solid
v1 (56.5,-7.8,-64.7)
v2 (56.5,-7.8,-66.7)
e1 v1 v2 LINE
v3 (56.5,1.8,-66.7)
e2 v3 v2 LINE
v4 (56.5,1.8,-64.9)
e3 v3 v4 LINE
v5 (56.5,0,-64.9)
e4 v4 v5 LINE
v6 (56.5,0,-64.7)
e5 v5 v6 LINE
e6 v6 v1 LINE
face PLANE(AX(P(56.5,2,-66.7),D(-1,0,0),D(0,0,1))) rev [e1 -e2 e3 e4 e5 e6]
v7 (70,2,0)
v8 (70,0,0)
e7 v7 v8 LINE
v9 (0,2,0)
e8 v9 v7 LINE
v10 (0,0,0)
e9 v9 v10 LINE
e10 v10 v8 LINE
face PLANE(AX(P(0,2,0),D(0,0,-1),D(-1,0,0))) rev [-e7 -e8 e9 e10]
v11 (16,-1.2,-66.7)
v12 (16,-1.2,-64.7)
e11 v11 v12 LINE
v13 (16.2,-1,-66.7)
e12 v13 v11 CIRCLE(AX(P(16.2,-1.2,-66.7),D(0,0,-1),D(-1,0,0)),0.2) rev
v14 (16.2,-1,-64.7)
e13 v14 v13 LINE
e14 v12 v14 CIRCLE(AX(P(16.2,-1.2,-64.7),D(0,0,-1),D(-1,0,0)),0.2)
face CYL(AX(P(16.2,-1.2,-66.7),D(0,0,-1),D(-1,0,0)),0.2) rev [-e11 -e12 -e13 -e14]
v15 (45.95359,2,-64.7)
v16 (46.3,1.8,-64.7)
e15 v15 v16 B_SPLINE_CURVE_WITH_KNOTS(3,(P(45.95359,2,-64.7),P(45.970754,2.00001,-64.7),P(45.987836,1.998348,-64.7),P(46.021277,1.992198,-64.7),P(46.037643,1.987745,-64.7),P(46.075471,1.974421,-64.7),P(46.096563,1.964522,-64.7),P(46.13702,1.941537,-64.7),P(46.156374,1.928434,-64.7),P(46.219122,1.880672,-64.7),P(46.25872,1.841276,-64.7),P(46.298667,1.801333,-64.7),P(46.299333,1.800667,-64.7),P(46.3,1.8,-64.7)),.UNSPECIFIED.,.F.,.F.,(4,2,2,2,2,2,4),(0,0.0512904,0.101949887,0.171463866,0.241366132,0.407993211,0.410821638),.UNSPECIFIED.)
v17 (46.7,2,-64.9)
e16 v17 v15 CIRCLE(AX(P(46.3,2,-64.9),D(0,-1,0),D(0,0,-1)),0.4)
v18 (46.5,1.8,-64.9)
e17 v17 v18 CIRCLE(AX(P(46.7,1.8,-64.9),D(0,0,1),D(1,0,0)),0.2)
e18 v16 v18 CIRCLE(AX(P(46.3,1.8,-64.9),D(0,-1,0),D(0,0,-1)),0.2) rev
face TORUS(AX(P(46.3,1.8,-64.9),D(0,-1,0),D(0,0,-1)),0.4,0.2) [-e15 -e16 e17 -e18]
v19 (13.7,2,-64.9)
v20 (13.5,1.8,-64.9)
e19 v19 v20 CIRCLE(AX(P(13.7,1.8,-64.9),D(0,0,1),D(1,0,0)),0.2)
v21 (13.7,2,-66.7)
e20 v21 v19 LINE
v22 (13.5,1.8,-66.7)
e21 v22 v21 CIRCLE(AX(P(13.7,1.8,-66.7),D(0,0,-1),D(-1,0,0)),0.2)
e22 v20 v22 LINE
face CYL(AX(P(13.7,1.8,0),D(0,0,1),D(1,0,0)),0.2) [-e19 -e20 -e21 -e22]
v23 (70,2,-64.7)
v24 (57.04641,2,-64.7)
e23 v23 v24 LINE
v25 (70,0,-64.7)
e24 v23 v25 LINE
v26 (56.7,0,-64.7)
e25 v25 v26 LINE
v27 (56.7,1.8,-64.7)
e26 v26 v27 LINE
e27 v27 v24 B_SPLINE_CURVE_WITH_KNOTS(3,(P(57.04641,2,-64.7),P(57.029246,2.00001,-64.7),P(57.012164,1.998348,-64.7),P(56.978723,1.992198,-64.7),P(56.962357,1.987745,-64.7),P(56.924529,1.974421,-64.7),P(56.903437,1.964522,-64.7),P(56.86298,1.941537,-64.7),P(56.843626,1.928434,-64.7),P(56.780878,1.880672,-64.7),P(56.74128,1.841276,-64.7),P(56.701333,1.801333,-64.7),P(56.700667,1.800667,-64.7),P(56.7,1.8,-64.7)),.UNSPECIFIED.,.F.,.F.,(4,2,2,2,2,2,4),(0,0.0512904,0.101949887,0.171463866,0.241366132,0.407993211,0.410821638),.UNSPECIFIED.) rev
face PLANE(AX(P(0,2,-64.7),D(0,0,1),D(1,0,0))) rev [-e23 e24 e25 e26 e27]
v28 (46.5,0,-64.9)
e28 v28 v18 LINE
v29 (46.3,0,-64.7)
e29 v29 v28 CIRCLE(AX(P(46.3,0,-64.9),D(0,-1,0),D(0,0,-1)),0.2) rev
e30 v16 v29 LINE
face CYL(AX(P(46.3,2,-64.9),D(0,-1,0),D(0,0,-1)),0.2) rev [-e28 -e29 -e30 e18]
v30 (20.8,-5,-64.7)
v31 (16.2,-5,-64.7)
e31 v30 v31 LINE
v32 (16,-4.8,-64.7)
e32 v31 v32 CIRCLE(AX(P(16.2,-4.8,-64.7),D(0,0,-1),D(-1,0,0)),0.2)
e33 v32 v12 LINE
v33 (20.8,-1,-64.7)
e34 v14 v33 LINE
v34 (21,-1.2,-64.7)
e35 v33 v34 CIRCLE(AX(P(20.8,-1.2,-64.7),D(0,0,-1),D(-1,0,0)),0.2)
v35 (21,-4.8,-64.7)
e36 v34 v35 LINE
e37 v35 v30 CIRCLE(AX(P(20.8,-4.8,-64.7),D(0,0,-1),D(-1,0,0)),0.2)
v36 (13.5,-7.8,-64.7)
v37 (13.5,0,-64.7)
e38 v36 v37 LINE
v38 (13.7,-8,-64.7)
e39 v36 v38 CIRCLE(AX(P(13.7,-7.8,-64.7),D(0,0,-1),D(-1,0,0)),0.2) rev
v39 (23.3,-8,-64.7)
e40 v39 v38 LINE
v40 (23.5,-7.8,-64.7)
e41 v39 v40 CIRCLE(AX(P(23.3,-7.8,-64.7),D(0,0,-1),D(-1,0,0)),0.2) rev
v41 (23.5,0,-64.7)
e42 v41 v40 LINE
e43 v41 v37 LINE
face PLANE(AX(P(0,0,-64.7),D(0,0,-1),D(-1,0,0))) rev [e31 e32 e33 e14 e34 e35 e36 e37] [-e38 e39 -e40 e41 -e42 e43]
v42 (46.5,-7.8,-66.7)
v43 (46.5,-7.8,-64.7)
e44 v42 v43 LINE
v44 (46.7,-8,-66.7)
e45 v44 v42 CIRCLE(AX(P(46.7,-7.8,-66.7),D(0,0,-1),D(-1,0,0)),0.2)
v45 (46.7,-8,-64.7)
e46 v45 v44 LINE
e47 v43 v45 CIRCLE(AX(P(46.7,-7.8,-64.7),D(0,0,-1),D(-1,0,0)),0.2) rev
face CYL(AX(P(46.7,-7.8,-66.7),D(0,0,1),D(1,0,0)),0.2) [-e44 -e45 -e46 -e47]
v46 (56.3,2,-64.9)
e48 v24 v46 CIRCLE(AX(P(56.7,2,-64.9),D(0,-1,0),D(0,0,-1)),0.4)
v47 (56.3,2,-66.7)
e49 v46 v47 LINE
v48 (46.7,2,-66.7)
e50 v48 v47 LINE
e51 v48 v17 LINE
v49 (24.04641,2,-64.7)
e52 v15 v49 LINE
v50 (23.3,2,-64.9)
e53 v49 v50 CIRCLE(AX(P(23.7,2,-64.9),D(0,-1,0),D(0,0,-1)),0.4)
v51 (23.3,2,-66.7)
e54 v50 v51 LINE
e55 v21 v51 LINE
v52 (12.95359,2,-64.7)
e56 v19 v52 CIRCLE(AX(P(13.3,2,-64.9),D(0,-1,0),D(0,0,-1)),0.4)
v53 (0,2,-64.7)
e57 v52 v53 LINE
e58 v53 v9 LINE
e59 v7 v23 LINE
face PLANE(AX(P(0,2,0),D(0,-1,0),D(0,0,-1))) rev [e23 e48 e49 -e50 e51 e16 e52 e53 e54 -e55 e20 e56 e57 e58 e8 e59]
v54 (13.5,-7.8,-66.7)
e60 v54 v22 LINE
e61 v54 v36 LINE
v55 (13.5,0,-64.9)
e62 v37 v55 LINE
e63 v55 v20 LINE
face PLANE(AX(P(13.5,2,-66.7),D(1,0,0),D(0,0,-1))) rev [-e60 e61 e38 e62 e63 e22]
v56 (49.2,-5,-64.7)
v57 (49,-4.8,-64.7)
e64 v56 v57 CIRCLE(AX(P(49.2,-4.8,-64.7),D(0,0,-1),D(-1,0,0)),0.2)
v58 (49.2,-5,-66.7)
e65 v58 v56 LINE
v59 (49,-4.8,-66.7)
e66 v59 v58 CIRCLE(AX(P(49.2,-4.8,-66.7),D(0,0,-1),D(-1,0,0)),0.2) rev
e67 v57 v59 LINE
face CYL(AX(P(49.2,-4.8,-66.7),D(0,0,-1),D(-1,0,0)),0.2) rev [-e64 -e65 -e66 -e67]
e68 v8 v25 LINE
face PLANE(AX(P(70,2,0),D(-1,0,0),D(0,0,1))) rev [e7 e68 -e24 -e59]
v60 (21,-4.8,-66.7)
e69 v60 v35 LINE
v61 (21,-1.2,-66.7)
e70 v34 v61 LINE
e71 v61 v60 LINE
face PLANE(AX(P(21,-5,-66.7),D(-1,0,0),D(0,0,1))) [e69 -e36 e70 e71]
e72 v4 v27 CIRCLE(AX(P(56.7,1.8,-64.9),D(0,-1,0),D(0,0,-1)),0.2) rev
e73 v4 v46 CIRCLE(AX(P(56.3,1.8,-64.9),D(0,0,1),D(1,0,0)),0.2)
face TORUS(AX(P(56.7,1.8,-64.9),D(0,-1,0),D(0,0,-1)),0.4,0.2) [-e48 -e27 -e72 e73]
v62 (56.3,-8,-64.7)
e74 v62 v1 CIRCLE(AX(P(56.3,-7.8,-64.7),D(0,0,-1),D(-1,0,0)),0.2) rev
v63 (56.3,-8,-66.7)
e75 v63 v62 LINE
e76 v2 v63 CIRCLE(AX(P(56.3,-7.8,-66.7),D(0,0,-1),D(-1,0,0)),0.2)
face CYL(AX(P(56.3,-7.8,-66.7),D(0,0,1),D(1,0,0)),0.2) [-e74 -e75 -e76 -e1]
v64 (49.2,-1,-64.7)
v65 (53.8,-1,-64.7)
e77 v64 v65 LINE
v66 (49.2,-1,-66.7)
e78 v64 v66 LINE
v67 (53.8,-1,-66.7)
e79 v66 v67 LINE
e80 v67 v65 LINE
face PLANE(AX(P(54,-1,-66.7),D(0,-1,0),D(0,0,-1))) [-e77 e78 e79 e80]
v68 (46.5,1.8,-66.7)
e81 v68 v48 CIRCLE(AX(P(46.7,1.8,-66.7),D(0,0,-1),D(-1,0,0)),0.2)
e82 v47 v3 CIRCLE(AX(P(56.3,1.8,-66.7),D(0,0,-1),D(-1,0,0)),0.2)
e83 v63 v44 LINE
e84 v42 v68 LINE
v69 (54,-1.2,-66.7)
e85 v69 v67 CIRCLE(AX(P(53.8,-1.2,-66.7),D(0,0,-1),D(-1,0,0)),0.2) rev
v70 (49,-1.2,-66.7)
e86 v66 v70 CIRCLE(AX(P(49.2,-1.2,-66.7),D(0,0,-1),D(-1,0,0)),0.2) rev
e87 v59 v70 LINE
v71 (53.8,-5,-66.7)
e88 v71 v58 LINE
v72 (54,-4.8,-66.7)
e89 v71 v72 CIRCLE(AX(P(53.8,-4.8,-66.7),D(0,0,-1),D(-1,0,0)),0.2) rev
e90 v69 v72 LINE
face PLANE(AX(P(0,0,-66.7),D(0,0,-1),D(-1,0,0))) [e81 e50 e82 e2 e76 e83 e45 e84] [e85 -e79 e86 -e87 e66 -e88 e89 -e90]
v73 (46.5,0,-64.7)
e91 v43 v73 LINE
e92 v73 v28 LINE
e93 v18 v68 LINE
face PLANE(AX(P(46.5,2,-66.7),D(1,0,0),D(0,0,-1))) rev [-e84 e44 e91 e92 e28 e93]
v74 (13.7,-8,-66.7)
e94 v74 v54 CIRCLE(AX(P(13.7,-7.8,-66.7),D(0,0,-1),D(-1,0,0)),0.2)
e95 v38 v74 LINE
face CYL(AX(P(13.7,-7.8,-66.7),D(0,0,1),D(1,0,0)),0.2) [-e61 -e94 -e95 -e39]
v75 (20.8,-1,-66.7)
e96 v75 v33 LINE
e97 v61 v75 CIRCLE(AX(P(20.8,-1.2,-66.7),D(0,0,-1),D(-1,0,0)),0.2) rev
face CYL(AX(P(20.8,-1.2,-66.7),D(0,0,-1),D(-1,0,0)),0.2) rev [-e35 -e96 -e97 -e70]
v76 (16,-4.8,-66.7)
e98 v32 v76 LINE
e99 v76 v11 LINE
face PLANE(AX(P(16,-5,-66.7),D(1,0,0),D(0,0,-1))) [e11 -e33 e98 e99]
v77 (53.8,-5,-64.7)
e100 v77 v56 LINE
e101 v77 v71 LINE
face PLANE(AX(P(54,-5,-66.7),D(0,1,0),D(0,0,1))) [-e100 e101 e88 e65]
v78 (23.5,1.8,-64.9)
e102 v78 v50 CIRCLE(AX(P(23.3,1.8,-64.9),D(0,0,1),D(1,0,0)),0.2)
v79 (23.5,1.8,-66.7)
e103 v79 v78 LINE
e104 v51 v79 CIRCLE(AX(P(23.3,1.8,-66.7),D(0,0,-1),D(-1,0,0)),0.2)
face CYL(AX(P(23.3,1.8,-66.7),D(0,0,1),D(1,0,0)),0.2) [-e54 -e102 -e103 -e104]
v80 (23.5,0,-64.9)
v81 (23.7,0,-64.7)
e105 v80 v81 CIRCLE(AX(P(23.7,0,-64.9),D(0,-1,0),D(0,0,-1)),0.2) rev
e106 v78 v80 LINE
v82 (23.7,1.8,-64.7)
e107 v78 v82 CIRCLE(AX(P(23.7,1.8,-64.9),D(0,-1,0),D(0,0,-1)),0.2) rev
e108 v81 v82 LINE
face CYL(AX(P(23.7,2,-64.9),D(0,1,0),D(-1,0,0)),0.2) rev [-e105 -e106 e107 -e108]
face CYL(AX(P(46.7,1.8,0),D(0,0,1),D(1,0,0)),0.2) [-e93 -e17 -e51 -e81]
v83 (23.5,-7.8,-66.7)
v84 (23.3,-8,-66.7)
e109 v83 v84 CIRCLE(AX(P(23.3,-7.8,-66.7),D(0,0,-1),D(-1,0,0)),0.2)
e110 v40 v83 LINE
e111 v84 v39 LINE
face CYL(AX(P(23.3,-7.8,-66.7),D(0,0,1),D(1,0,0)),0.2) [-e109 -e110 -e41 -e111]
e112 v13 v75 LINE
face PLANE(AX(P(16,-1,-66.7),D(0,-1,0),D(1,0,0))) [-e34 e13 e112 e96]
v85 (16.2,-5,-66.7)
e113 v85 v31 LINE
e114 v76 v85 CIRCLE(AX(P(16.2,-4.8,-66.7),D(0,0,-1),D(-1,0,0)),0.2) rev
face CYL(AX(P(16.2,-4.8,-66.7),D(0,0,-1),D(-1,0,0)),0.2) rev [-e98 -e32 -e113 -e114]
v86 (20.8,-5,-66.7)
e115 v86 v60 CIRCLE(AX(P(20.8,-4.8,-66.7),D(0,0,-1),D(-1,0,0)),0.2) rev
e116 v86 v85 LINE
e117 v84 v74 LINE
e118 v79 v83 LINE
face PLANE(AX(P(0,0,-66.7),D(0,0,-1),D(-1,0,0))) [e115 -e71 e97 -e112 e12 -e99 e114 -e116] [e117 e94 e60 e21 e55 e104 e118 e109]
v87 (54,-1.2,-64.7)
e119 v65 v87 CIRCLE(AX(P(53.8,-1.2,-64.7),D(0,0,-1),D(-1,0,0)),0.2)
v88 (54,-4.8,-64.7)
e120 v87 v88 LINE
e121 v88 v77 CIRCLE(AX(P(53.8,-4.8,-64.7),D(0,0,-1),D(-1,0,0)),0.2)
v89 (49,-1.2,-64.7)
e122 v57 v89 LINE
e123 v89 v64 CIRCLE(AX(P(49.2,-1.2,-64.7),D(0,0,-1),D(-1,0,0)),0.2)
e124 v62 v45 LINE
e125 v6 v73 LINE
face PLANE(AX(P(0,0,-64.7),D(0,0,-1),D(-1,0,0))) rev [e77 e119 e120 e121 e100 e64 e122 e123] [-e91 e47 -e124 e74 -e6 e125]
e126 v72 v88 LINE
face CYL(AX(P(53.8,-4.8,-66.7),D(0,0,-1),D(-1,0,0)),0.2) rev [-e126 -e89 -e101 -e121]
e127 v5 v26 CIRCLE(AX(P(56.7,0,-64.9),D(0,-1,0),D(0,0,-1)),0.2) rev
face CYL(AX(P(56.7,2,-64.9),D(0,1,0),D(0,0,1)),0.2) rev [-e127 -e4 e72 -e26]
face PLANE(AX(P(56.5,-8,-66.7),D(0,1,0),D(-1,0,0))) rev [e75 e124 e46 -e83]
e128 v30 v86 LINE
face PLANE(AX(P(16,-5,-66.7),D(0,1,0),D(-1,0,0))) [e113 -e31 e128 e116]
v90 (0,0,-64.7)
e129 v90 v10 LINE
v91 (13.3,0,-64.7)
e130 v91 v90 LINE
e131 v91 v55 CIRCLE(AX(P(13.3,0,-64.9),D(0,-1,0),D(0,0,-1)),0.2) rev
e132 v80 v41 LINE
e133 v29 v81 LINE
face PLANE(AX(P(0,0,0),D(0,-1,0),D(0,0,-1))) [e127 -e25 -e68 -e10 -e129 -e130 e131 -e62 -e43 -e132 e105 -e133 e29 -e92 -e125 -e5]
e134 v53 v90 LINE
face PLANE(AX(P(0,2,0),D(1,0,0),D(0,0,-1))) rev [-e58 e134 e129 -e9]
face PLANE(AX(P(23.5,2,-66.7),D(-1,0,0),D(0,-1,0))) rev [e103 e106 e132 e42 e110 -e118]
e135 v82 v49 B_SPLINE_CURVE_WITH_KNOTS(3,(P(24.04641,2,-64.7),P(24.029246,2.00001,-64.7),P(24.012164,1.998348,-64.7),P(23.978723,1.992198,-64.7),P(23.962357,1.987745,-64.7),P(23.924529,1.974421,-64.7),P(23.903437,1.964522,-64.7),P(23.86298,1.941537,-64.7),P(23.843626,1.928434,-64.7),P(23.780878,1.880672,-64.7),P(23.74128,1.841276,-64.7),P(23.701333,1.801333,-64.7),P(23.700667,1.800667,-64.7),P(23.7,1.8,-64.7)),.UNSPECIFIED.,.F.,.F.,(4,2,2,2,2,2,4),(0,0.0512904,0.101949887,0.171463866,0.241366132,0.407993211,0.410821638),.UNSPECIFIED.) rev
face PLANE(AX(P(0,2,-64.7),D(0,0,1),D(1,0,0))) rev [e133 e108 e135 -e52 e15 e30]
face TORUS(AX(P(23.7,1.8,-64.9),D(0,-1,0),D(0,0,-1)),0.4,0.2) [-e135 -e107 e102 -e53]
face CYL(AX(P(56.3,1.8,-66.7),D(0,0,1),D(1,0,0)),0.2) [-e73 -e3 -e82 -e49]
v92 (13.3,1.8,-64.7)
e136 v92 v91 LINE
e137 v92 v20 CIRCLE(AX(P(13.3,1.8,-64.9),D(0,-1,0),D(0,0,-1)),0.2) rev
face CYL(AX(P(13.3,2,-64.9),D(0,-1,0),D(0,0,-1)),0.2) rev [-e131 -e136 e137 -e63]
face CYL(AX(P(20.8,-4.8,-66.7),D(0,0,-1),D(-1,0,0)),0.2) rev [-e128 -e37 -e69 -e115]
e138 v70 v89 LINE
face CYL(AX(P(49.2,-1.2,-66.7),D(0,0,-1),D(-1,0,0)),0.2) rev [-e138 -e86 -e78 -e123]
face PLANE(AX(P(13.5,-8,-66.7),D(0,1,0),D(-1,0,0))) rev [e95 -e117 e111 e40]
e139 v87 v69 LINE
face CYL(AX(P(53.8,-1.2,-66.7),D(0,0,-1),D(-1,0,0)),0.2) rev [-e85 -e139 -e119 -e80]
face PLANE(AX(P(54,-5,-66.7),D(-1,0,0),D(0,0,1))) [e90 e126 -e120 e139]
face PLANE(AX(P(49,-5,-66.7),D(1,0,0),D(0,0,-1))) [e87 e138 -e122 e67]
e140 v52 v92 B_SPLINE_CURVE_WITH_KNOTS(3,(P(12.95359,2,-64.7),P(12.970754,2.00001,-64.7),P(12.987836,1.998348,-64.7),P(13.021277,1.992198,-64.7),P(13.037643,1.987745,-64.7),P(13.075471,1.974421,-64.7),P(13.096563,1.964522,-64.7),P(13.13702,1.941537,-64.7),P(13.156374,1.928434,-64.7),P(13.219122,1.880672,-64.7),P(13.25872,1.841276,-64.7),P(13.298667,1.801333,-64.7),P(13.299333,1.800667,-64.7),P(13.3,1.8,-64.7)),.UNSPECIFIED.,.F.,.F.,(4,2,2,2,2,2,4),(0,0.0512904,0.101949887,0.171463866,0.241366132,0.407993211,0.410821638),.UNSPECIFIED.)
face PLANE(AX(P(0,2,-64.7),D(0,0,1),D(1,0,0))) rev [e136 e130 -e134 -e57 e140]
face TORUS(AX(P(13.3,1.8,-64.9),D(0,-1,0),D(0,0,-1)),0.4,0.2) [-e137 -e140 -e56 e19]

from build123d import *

# Parameters (mm, degrees)
SKETCH1_W           = 70
SKETCH1_H           = 64.7
BOSS_EXTRUDE1_DEPTH = 2
SKETCH2_W           = 10
SKETCH2_H           = 10
SKETCH2_W_2         = 5
SKETCH2_H_2         = 4
BOSS_EXTRUDE2_DEPTH = 2
FILLET2_R           = 0.2


with BuildPart() as part:
    # Sketch1 → Boss-Extrude1 (new body)
    with BuildSketch(Plane(origin=(0, 0, 0), x_dir=(1, 0, 0), z_dir=(0, 1, 0))):
        with Locations((35, 32.35)):
            Rectangle(SKETCH1_W, SKETCH1_H)
    extrude(amount=BOSS_EXTRUDE1_DEPTH)

    # Sketch2 → Boss-Extrude2 (add)
    # profile 1 of 2: a face of its own
    with BuildSketch(Plane(origin=(0, 0, -64.7), x_dir=(-1, 0, 0), z_dir=(0, 0, -1))):
        with Locations((-51.5, -3)):
            Rectangle(SKETCH2_W, SKETCH2_H)
        with Locations((-51.5, -3)):
            Rectangle(SKETCH2_W_2, SKETCH2_H_2, mode=Mode.SUBTRACT)
    # profile 2 of 2: a face of its own
    with BuildSketch(Plane(origin=(0, 0, -64.7), x_dir=(-1, 0, 0), z_dir=(0, 0, -1))):
        with Locations((-18.5, -3)):
            Rectangle(SKETCH2_W, SKETCH2_H)
        with Locations((-18.5, -3)):
            Rectangle(SKETCH2_W_2, SKETCH2_H_2, mode=Mode.SUBTRACT)
    extrude(amount=BOSS_EXTRUDE2_DEPTH)

    # Fillet2
    # the kernel refuses this fillet: 0.2 mm, written as the material it adds along each edge
    with BuildSketch(Plane(origin=(13.5, 0, -64.7), x_dir=(-1, 0, 0), z_dir=(0, 1, 0)), Plane(origin=(23.5, 2, -64.7), x_dir=(1, 0, 0), z_dir=(0, -1, 0)), Plane(origin=(21, -5, -64.7), x_dir=(0, 1, 0), z_dir=(0, 0, -1)), Plane(origin=(16, -5, -64.7), x_dir=(1, 0, 0), z_dir=(0, 0, -1)), Plane(origin=(49, -5, -64.7), x_dir=(1, 0, 0), z_dir=(0, 0, -1)), Plane(origin=(49, -1, -64.7), x_dir=(0, -1, 0), z_dir=(0, 0, -1))) as fillet2_piece_1:
        with BuildLine():
            CenterArc((FILLET2_R, -FILLET2_R), FILLET2_R, 90, 90)
            Line((0, -FILLET2_R), (0, 0))
            Line((0, 0), (FILLET2_R, 0))
        make_face()
    extrude(amount=2)
    with BuildSketch(Plane(origin=(56.5, 0, -64.7), x_dir=(1, 0, 0), z_dir=(0, 1, 0)), Plane(origin=(46.5, 2, -64.7), x_dir=(-1, 0, 0), z_dir=(0, -1, 0)), Plane(origin=(21, -1, -64.7), x_dir=(0, -1, 0), z_dir=(0, 0, -1)), Plane(origin=(16, -1, -64.7), x_dir=(1, 0, 0), z_dir=(0, 0, -1)), Plane(origin=(54, -1, -64.7), x_dir=(0, -1, 0), z_dir=(0, 0, -1)), Plane(origin=(54, -5, -64.7), x_dir=(-1, 0, 0), z_dir=(0, 0, -1))) as fillet2_piece_2:
        with BuildLine():
            CenterArc((FILLET2_R, FILLET2_R), FILLET2_R, 180, 90)
            Line((0, FILLET2_R), (0, 0))
            Line((0, 0), (FILLET2_R, 0))
        make_face()
    extrude(amount=2)
    # the kernel refuses this fillet: 0.2 mm, written as the material it takes off along each edge
    with BuildSketch(Plane(origin=(13.5, 2, -64.9), x_dir=(1, 0, 0), z_dir=(0, 0, -1)), Plane(origin=(46.5, 2, -64.9), x_dir=(1, 0, 0), z_dir=(0, 0, -1))) as fillet2_2_piece_1:
        with BuildLine():
            CenterArc((FILLET2_R, FILLET2_R), FILLET2_R, 180, 90)
            Line((0, FILLET2_R), (0, 0))
            Line((0, 0), (FILLET2_R, 0))
        make_face()
    extrude(amount=2.3, mode=Mode.SUBTRACT)
    with BuildSketch(Plane(origin=(13.5, -8, -64.2), x_dir=(0, 1, 0), z_dir=(0, 0, -1)), Plane(origin=(46.5, -8, -64.2), x_dir=(0, 1, 0), z_dir=(0, 0, -1))) as fillet2_2_piece_2:
        with BuildLine():
            CenterArc((FILLET2_R, FILLET2_R), FILLET2_R, 180, 90)
            Line((0, FILLET2_R), (0, 0))
            Line((0, 0), (FILLET2_R, 0))
        make_face()
    extrude(amount=3, mode=Mode.SUBTRACT)
    with BuildSketch(Plane(origin=(23.5, -8, -64.2), x_dir=(0, 1, 0), z_dir=(0, 0, -1)), Plane(origin=(56.5, -8, -64.2), x_dir=(0, 1, 0), z_dir=(0, 0, -1))) as fillet2_2_piece_3:
        with BuildLine():
            CenterArc((FILLET2_R, -FILLET2_R), FILLET2_R, 90, 90)
            Line((0, -FILLET2_R), (0, 0))
            Line((0, 0), (FILLET2_R, 0))
        make_face()
    extrude(amount=3, mode=Mode.SUBTRACT)
    with BuildSketch(Plane(origin=(23.5, 2, -64.9), x_dir=(-1, 0, 0), z_dir=(0, 0, -1)), Plane(origin=(56.5, 2, -64.9), x_dir=(-1, 0, 0), z_dir=(0, 0, -1))) as fillet2_2_piece_4:
        with BuildLine():
            CenterArc((FILLET2_R, -FILLET2_R), FILLET2_R, 90, 90)
            Line((0, -FILLET2_R), (0, 0))
            Line((0, 0), (FILLET2_R, 0))
        make_face()
    extrude(amount=2.3, mode=Mode.SUBTRACT)
    with BuildSketch(Plane(origin=(46.3, 2, -64.9), x_dir=(-0.5976672776327815, 0, -0.8017442392976825), z_dir=(0.8017442392976825, 0, -0.5976672776327815))) as fillet2_2_piece_5:
        with BuildLine():
            CenterArc((0.2 + FILLET2_R, -FILLET2_R), FILLET2_R, 90, 90)
            Line((0.2, -FILLET2_R), (0.2, 0))
            Line((0.2, 0), (0.2 + FILLET2_R, 0))
        make_face()
    revolve(axis=Axis((46.3, 2, -64.9), (0, 1, 0)), revolution_arc=233.296989237, mode=Mode.SUBTRACT)
    with BuildSketch(Plane(origin=(56.7, 2, -64.9), x_dir=(0.5976672776327815, 0, -0.8017442392976825), z_dir=(-0.8017442392976825, 0, -0.5976672776327815))) as fillet2_2_piece_6:
        with BuildLine():
            CenterArc((0.2 + FILLET2_R, FILLET2_R), FILLET2_R, 180, 90)
            Line((0.2, FILLET2_R), (0.2, 0))
            Line((0.2, 0), (0.2 + FILLET2_R, 0))
        make_face()
    revolve(axis=Axis((56.7, 2, -64.9), (0, -1, 0)), revolution_arc=233.296989237, mode=Mode.SUBTRACT)
    with BuildSketch(Plane(origin=(23.7, 2, -64.9), x_dir=(0.5976672776328044, 0, -0.8017442392976655), z_dir=(-0.8017442392976655, 0, -0.5976672776328044))) as fillet2_2_piece_7:
        with BuildLine():
            CenterArc((0.2 + FILLET2_R, FILLET2_R), FILLET2_R, 180, 90)
            Line((0.2, FILLET2_R), (0.2, 0))
            Line((0.2, 0), (0.2 + FILLET2_R, 0))
        make_face()
    revolve(axis=Axis((23.7, 2, -64.9), (0, -1, 0)), revolution_arc=233.296989237, mode=Mode.SUBTRACT)
    with BuildSketch(Plane(origin=(13.3, 2, -64.9), x_dir=(-0.5976672776327986, 0, -0.8017442392976697), z_dir=(0.8017442392976697, 0, -0.5976672776327986))) as fillet2_2_piece_8:
        with BuildLine():
            CenterArc((0.2 + FILLET2_R, -FILLET2_R), FILLET2_R, 90, 90)
            Line((0.2, -FILLET2_R), (0.2, 0))
            Line((0.2, 0), (0.2 + FILLET2_R, 0))
        make_face()
    revolve(axis=Axis((13.3, 2, -64.9), (0, 1, 0)), revolution_arc=233.296989237, mode=Mode.SUBTRACT)


solid = part.part
